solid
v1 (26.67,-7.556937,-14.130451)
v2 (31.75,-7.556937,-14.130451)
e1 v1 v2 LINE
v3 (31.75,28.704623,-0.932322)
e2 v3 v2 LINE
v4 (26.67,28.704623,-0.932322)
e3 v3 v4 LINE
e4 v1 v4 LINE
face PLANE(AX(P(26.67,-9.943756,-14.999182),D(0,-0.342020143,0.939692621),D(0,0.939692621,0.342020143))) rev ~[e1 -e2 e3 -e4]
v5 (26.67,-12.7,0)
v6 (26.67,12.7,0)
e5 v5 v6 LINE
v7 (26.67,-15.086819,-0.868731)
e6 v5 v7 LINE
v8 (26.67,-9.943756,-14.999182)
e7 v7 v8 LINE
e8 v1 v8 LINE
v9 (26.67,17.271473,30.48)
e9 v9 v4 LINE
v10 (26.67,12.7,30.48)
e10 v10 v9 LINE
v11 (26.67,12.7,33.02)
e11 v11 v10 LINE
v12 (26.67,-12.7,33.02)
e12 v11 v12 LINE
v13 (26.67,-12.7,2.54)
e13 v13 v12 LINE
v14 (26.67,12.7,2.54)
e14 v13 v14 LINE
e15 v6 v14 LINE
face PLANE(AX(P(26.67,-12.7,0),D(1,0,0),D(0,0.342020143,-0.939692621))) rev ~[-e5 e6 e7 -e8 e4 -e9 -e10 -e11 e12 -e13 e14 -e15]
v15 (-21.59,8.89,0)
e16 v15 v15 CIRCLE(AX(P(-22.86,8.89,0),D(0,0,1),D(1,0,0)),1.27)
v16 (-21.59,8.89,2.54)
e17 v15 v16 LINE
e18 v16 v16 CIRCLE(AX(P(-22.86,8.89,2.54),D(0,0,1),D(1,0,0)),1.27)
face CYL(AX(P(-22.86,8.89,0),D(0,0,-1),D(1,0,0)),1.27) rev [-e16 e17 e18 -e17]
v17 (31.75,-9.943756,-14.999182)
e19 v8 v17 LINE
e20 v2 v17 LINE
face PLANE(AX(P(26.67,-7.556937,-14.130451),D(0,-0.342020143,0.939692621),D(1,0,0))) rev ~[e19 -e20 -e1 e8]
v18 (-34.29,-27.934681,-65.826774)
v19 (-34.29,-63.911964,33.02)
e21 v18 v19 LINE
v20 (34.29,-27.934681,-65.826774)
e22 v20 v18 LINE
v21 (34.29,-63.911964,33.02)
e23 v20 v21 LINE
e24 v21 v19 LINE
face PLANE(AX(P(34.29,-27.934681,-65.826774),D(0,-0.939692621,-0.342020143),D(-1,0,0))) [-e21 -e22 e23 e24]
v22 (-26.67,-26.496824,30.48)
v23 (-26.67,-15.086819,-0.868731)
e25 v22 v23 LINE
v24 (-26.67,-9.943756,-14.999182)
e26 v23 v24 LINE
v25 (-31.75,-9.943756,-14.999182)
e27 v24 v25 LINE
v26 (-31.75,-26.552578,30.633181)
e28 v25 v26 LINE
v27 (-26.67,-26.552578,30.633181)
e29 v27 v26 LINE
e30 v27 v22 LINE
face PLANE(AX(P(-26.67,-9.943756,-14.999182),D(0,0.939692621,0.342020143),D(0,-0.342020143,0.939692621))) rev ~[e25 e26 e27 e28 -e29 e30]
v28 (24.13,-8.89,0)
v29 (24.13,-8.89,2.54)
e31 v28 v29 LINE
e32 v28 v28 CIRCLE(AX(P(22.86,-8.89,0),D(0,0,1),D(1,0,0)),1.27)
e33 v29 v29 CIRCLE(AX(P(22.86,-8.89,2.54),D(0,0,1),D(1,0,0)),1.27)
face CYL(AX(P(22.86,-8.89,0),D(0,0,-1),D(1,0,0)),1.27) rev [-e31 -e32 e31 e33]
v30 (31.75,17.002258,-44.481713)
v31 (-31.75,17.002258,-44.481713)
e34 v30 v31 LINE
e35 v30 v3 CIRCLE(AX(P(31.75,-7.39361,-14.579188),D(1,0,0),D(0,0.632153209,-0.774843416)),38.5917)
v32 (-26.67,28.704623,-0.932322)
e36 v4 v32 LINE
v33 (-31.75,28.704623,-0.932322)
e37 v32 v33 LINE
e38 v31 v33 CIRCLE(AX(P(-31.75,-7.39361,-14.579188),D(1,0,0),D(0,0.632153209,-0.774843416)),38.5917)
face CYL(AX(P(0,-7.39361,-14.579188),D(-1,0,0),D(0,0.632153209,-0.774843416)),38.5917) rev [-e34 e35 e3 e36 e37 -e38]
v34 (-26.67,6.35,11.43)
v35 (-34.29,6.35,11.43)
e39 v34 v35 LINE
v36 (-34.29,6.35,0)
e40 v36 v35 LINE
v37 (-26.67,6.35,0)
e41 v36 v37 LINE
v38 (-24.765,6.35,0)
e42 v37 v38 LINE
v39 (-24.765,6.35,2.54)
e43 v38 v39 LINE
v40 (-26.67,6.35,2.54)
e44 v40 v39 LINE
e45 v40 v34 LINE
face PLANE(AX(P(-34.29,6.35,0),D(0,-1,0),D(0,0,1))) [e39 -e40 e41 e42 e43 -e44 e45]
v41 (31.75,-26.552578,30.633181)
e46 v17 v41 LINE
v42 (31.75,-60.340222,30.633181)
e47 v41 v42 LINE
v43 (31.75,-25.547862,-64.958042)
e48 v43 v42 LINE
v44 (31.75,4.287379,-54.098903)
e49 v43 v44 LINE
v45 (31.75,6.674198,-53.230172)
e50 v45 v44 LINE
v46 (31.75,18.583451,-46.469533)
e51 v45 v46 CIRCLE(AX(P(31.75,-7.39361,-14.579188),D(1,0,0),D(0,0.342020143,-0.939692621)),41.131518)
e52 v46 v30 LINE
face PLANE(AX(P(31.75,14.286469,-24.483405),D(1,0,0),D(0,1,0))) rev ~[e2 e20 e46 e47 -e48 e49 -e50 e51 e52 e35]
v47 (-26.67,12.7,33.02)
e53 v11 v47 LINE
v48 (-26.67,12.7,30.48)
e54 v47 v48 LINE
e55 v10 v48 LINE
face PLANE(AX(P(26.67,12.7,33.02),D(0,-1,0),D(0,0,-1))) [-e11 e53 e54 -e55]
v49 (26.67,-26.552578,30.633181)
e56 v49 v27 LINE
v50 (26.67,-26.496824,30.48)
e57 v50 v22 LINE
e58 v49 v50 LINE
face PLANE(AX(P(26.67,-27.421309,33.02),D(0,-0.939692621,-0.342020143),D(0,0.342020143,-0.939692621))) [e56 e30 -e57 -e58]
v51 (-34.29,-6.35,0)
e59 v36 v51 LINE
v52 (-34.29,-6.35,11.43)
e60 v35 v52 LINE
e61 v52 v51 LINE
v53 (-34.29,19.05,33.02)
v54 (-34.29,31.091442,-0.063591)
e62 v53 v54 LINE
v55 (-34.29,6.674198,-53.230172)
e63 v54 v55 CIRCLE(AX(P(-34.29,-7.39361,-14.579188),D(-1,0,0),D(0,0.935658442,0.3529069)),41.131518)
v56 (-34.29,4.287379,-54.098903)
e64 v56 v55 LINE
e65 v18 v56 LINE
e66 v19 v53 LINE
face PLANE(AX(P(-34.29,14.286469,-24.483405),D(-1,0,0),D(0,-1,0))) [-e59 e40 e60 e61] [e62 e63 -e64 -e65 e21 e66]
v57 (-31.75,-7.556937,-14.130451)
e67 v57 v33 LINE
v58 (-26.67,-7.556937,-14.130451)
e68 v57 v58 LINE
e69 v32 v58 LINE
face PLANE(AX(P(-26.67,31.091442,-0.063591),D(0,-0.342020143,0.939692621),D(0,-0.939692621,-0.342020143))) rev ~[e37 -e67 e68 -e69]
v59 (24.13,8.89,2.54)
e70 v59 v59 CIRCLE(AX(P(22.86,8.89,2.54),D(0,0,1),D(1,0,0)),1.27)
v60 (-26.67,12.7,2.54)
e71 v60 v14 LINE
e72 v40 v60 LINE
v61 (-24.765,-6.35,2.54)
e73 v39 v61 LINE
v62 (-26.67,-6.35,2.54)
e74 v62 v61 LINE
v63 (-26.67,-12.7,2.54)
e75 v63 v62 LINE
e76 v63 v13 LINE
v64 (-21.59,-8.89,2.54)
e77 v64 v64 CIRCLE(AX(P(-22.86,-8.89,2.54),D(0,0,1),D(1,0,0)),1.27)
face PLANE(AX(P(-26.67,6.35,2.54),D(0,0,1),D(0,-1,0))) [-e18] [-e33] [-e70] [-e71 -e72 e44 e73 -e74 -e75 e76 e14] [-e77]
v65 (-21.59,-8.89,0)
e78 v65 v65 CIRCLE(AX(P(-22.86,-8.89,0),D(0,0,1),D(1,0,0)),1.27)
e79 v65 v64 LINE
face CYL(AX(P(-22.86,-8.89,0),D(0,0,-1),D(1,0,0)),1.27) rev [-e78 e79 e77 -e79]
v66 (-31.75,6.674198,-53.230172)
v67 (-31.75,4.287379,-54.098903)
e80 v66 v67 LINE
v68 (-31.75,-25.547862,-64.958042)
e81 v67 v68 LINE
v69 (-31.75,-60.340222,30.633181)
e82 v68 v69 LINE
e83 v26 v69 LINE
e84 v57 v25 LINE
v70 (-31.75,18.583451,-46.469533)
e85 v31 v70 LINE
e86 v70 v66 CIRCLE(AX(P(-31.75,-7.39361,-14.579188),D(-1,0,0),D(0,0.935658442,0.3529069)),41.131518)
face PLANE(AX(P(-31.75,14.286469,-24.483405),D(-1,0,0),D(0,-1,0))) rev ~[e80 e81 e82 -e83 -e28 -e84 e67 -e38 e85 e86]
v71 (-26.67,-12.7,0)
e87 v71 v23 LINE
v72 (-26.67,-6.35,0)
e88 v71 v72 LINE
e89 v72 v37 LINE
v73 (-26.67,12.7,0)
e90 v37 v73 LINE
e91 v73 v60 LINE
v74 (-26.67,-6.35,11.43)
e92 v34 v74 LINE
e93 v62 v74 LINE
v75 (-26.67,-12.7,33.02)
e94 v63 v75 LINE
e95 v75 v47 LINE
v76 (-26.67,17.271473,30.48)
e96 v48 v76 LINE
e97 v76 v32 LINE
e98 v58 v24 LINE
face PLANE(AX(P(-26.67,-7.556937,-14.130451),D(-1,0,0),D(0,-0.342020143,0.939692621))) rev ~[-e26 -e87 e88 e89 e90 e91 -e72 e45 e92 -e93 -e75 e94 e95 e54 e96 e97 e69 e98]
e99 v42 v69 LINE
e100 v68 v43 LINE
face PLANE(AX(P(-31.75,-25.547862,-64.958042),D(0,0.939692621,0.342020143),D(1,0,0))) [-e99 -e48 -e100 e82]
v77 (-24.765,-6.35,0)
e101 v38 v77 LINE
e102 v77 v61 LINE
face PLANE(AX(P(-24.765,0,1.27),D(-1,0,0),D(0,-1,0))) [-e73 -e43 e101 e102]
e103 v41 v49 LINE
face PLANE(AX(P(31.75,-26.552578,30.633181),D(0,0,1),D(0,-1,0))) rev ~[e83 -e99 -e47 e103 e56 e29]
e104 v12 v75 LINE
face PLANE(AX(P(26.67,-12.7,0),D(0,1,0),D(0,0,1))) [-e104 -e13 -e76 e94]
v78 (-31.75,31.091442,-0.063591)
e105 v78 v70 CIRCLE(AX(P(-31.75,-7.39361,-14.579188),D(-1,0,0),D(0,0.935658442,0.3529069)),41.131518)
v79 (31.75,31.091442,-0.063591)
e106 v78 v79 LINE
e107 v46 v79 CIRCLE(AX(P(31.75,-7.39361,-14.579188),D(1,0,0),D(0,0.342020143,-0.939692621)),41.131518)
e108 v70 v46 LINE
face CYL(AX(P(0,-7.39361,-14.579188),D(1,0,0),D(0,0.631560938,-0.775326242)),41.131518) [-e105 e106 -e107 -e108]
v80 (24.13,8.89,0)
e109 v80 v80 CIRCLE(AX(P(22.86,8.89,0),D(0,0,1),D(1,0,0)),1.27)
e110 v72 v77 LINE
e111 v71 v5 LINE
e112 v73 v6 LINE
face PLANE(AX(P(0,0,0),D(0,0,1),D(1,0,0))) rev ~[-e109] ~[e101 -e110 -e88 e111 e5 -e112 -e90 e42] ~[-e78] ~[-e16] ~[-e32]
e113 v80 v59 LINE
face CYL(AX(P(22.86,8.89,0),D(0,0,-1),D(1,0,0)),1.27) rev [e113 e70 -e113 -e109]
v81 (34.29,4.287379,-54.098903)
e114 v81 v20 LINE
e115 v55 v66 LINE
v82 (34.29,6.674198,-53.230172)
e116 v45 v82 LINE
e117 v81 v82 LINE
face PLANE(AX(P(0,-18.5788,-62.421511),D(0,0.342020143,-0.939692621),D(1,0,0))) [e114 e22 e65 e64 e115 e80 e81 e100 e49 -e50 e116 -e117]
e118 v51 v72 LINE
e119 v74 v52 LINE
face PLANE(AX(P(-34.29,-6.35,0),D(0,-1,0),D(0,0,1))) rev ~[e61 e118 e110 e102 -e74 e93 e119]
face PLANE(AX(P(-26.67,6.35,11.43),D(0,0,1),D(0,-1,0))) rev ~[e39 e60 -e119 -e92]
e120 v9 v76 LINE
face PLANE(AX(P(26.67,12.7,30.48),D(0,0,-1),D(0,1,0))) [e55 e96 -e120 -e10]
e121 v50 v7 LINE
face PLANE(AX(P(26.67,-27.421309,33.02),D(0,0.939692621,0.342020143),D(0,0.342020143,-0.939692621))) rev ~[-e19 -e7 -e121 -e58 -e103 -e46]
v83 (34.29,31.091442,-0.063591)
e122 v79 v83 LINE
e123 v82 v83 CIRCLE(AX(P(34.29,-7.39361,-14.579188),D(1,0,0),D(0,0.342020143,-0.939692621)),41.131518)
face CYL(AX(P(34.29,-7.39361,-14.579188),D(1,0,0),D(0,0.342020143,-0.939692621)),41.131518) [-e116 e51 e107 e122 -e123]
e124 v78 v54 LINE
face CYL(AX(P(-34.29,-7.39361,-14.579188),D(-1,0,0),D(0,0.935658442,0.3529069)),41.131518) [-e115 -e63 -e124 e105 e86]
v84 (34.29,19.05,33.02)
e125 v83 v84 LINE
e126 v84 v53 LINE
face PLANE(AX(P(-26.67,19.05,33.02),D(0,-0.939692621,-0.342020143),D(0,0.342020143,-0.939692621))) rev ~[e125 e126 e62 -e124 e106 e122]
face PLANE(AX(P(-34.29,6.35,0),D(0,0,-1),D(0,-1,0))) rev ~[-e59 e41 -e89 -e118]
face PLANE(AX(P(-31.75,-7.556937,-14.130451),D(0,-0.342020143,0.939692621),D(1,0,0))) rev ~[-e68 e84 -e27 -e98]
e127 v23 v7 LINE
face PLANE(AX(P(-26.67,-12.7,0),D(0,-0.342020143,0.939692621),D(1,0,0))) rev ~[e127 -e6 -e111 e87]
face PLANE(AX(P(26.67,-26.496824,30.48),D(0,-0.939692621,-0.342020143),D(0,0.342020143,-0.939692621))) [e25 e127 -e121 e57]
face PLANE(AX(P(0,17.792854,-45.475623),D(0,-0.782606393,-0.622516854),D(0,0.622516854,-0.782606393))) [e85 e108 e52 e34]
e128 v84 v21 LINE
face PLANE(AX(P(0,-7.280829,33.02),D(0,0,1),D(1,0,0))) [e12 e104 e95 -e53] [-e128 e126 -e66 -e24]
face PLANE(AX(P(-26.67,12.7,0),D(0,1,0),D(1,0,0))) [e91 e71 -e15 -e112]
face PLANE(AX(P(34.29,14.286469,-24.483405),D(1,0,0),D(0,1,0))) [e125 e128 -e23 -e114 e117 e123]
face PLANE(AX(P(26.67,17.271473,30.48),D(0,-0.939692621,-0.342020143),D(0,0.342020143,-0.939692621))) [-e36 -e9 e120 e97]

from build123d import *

# Parameters (mm, degrees)
F0_W      = 53.34
F0_H      = 25.4
F0_R      = 1.27
F1_DEPTH  = 2.54
F3_DEPTH  = 53.34
F5_DEPTH  = 7.62
F6_W      = 12.7
F6_H      = 8.89
F7_DEPTH  = 7.62
F8_W      = 12.7
F8_H      = 2.54
F9_DEPTH  = 9.525
F10_W     = 68.58
F10_H     = 41.6090539173
F11_DEPTH = 2.54
F13_REACH = 169.3857709485
F15_DEPTH = 63.5
F17_DEPTH = 2.54
F19_DEPTH = 2.54
F21_DEPTH = 2.54
F22_W     = 63.5
F22_H     = 2.54


with BuildPart() as f1:
    # F0 (on Top) → F1 (new body)
    with BuildSketch(Plane.XY):
        Rectangle(F0_W, F0_H)
        with Locations((-22.86, -8.89)):
            Circle(F0_R, mode=Mode.SUBTRACT)
        with Locations((22.86, -8.89)):
            Circle(F0_R, mode=Mode.SUBTRACT)
        with Locations((-22.86, 8.89)):
            Circle(F0_R, mode=Mode.SUBTRACT)
        with Locations((22.86, 8.89)):
            Circle(F0_R, mode=Mode.SUBTRACT)
    extrude(amount=F1_DEPTH)

    # F2 (on face) → F3 (join, through all)
    with BuildSketch(Plane.YZ.offset(26.67)):
        Polygon((-15.24, -0.447870531), (-9.9437557743, -14.9991819491), (-7.5569365175, -14.130450785), (-12.7, 0), (-12.7, 2.54), (-12.7, 33.02), (-27.4213086776, 33.02), (-26.4968242825, 30.48), (-15.24, 30.48), align=None)
        Polygon((-26.4968242825, 30.48), (-15.24, -0.447870531), (-15.24, 30.48), align=None)
    extrude(amount=-F3_DEPTH)



with BuildPart() as f3:
    # F2 (on face) → F3, piece 2 (new body, through all)
    with BuildSketch(Plane.YZ.offset(26.67)):
        Polygon((12.7, 33.02), (12.7, 30.48), (17.2714728529, 30.48), (28.7046231961, -0.9323224012), (31.0914424529, -0.0635912371), (19.05, 33.02), align=None)
    extrude(amount=-F3_DEPTH)


with BuildPart() as f1_1:
    add(f1.part)

    add(f3.part)  # F5 merges F3
    # F4 (on face) → F5 (join)
    with BuildSketch(Plane.YZ.offset(26.67)):
        Polygon((-27.4213086776, 33.02), (-9.9437557743, -14.9991819491), (31.0914424529, -0.0635912371), (19.05, 33.02), align=None)
    extrude(amount=F5_DEPTH)

    # F6 (on face) → F7 (join)
    with BuildSketch(Plane(origin=(-26.67, 0, 0), x_dir=(0, -1, 0), z_dir=(-1, 0, 0))):
        Polygon((9.9437557743, -14.9991819491), (27.4213086776, 33.02), (-19.05, 33.02), (-31.0914424529, -0.0635912371), align=None)
        with Locations((0, 6.985)):
            Rectangle(F6_W, F6_H, mode=Mode.SUBTRACT)
    extrude(amount=F7_DEPTH)

    # F8 (on face) → F9 (cut)
    with BuildSketch(Plane(origin=(-34.29, 0, 0), x_dir=(0, -1, 0), z_dir=(-1, 0, 0))):
        with Locations((0, 1.27)):
            Rectangle(F8_W, F8_H)
    extrude(amount=-F9_DEPTH, mode=Mode.SUBTRACT)

    # F10 (on face) → F11 (join, through all)
    with BuildSketch(Plane(origin=(0, -13.6012014706, -4.9504324856), x_dir=(1, 0, 0), z_dir=(0, -0.9396926208, -0.3420201433))):
        with Locations((0, -31.4981827789)):
            Rectangle(F10_W, F10_H)
    extrude(amount=-F11_DEPTH)

    f13_end = Plane(origin=(0, -7.2808291762, 33.02), x_dir=(1, 0, 0), z_dir=(0, 0, 1))
    # F12 (on face) → F13 (join, up to a plane its end follows)
    with BuildSketch(Plane(origin=(0, 17.8885802808, -49.1484703875), x_dir=(1, 0, 0), z_dir=(0, 0.3420201433, -0.9396926208))):
        Polygon((31.75, 14.474096284), (34.29, 14.474096284), (34.29, 48.764096284), (-34.29, 48.764096284), (-34.29, 14.474096284), (-31.75, 14.474096284), (-31.75, 46.224096284), (31.75, 46.224096284), align=None)
    f13_long = extrude(amount=-F13_REACH, mode=Mode.PRIVATE)
    add(split(f13_long, bisect_by=f13_end, keep=Keep.BOTTOM, mode=Mode.PRIVATE))

    # F14 (on face) → F15 (join, through all)
    with BuildSketch(Plane(origin=(31.75, 0, 0), x_dir=(0, -1, 0), z_dir=(-1, 0, 0))):
        Polygon((27.4213086775, 33.02), (26.5525775135, 30.6331807432), (60.3402217897, 30.6331807432), (61.2089529537, 33.02), align=None)
    extrude(amount=F15_DEPTH)

    # F16 (on face) → F17 (cut, through all)
    with BuildSketch(Plane(origin=(0, -11.2143822138, -4.0817013215), x_dir=(-1, 0, 0), z_dir=(0, 0.9396926208, 0.3420201433))):
        Polygon((26.67, 4.3436558202), (-26.67, 4.3436558202), (-26.67, -10.6936558203), (-31.75, -10.6936558203), (-31.75, -52.3027097376), (31.75, -52.3027097376), (31.75, -10.6936558203), (26.67, -10.6936558203), align=None)
    extrude(amount=-F17_DEPTH, mode=Mode.SUBTRACT)

    # F18 (on face) → F19 (join)
    with BuildSketch(Plane.YZ.offset(34.29)):
        with BuildLine():
            ThreePointArc((6.6741980668, -53.230171709), (29.9844867323, -31.7454245982), (31.0914424529, -0.0635912371))
            Line((31.0914424529, -0.0635912371), (-7.5569365175, -14.130450785))
            Line((-7.5569365176, -14.130450785), (6.6741980668, -53.230171709))
        make_face()
    extrude(amount=-F19_DEPTH)

    # F20 (on face) → F21 (join)
    with BuildSketch(Plane(origin=(-34.29, 0, 0), x_dir=(0, -1, 0), z_dir=(-1, 0, 0))):
        with BuildLine():
            ThreePointArc((-31.0914424529, -0.0635912371), (-29.9844867323, -31.7454245982), (-6.6741980668, -53.230171709))
            Line((-6.6741980669, -53.230171709), (7.5569365175, -14.130450785))
            Line((7.5569365175, -14.130450785), (-31.0914424529, -0.0635912371))
        make_face()
    extrude(amount=-F21_DEPTH)

    # F24: sweep along a path in F23
    with BuildLine(Plane(origin=(31.75, 0, 0), x_dir=(0, -1, 0), z_dir=(-1, 0, 0))) as f24_path:
        ThreePointArc((-18.5834505022, -46.4695330224), (-32.3206049052, -25.2835298235), (-31.0914424529, -0.0635912371))
    # F22 (on face) → F24 (sweep)
    with BuildSketch(Plane(origin=(0, 3.6574456963, -10.0487494635), x_dir=(1, 0, 0), z_dir=(0, 0.3420201433, -0.9396926208))):
        with Locations((0, -27.9246495586)):
            Rectangle(F22_W, F22_H)
    sweep(path=f24_path.line)


solid = f1_1.part
